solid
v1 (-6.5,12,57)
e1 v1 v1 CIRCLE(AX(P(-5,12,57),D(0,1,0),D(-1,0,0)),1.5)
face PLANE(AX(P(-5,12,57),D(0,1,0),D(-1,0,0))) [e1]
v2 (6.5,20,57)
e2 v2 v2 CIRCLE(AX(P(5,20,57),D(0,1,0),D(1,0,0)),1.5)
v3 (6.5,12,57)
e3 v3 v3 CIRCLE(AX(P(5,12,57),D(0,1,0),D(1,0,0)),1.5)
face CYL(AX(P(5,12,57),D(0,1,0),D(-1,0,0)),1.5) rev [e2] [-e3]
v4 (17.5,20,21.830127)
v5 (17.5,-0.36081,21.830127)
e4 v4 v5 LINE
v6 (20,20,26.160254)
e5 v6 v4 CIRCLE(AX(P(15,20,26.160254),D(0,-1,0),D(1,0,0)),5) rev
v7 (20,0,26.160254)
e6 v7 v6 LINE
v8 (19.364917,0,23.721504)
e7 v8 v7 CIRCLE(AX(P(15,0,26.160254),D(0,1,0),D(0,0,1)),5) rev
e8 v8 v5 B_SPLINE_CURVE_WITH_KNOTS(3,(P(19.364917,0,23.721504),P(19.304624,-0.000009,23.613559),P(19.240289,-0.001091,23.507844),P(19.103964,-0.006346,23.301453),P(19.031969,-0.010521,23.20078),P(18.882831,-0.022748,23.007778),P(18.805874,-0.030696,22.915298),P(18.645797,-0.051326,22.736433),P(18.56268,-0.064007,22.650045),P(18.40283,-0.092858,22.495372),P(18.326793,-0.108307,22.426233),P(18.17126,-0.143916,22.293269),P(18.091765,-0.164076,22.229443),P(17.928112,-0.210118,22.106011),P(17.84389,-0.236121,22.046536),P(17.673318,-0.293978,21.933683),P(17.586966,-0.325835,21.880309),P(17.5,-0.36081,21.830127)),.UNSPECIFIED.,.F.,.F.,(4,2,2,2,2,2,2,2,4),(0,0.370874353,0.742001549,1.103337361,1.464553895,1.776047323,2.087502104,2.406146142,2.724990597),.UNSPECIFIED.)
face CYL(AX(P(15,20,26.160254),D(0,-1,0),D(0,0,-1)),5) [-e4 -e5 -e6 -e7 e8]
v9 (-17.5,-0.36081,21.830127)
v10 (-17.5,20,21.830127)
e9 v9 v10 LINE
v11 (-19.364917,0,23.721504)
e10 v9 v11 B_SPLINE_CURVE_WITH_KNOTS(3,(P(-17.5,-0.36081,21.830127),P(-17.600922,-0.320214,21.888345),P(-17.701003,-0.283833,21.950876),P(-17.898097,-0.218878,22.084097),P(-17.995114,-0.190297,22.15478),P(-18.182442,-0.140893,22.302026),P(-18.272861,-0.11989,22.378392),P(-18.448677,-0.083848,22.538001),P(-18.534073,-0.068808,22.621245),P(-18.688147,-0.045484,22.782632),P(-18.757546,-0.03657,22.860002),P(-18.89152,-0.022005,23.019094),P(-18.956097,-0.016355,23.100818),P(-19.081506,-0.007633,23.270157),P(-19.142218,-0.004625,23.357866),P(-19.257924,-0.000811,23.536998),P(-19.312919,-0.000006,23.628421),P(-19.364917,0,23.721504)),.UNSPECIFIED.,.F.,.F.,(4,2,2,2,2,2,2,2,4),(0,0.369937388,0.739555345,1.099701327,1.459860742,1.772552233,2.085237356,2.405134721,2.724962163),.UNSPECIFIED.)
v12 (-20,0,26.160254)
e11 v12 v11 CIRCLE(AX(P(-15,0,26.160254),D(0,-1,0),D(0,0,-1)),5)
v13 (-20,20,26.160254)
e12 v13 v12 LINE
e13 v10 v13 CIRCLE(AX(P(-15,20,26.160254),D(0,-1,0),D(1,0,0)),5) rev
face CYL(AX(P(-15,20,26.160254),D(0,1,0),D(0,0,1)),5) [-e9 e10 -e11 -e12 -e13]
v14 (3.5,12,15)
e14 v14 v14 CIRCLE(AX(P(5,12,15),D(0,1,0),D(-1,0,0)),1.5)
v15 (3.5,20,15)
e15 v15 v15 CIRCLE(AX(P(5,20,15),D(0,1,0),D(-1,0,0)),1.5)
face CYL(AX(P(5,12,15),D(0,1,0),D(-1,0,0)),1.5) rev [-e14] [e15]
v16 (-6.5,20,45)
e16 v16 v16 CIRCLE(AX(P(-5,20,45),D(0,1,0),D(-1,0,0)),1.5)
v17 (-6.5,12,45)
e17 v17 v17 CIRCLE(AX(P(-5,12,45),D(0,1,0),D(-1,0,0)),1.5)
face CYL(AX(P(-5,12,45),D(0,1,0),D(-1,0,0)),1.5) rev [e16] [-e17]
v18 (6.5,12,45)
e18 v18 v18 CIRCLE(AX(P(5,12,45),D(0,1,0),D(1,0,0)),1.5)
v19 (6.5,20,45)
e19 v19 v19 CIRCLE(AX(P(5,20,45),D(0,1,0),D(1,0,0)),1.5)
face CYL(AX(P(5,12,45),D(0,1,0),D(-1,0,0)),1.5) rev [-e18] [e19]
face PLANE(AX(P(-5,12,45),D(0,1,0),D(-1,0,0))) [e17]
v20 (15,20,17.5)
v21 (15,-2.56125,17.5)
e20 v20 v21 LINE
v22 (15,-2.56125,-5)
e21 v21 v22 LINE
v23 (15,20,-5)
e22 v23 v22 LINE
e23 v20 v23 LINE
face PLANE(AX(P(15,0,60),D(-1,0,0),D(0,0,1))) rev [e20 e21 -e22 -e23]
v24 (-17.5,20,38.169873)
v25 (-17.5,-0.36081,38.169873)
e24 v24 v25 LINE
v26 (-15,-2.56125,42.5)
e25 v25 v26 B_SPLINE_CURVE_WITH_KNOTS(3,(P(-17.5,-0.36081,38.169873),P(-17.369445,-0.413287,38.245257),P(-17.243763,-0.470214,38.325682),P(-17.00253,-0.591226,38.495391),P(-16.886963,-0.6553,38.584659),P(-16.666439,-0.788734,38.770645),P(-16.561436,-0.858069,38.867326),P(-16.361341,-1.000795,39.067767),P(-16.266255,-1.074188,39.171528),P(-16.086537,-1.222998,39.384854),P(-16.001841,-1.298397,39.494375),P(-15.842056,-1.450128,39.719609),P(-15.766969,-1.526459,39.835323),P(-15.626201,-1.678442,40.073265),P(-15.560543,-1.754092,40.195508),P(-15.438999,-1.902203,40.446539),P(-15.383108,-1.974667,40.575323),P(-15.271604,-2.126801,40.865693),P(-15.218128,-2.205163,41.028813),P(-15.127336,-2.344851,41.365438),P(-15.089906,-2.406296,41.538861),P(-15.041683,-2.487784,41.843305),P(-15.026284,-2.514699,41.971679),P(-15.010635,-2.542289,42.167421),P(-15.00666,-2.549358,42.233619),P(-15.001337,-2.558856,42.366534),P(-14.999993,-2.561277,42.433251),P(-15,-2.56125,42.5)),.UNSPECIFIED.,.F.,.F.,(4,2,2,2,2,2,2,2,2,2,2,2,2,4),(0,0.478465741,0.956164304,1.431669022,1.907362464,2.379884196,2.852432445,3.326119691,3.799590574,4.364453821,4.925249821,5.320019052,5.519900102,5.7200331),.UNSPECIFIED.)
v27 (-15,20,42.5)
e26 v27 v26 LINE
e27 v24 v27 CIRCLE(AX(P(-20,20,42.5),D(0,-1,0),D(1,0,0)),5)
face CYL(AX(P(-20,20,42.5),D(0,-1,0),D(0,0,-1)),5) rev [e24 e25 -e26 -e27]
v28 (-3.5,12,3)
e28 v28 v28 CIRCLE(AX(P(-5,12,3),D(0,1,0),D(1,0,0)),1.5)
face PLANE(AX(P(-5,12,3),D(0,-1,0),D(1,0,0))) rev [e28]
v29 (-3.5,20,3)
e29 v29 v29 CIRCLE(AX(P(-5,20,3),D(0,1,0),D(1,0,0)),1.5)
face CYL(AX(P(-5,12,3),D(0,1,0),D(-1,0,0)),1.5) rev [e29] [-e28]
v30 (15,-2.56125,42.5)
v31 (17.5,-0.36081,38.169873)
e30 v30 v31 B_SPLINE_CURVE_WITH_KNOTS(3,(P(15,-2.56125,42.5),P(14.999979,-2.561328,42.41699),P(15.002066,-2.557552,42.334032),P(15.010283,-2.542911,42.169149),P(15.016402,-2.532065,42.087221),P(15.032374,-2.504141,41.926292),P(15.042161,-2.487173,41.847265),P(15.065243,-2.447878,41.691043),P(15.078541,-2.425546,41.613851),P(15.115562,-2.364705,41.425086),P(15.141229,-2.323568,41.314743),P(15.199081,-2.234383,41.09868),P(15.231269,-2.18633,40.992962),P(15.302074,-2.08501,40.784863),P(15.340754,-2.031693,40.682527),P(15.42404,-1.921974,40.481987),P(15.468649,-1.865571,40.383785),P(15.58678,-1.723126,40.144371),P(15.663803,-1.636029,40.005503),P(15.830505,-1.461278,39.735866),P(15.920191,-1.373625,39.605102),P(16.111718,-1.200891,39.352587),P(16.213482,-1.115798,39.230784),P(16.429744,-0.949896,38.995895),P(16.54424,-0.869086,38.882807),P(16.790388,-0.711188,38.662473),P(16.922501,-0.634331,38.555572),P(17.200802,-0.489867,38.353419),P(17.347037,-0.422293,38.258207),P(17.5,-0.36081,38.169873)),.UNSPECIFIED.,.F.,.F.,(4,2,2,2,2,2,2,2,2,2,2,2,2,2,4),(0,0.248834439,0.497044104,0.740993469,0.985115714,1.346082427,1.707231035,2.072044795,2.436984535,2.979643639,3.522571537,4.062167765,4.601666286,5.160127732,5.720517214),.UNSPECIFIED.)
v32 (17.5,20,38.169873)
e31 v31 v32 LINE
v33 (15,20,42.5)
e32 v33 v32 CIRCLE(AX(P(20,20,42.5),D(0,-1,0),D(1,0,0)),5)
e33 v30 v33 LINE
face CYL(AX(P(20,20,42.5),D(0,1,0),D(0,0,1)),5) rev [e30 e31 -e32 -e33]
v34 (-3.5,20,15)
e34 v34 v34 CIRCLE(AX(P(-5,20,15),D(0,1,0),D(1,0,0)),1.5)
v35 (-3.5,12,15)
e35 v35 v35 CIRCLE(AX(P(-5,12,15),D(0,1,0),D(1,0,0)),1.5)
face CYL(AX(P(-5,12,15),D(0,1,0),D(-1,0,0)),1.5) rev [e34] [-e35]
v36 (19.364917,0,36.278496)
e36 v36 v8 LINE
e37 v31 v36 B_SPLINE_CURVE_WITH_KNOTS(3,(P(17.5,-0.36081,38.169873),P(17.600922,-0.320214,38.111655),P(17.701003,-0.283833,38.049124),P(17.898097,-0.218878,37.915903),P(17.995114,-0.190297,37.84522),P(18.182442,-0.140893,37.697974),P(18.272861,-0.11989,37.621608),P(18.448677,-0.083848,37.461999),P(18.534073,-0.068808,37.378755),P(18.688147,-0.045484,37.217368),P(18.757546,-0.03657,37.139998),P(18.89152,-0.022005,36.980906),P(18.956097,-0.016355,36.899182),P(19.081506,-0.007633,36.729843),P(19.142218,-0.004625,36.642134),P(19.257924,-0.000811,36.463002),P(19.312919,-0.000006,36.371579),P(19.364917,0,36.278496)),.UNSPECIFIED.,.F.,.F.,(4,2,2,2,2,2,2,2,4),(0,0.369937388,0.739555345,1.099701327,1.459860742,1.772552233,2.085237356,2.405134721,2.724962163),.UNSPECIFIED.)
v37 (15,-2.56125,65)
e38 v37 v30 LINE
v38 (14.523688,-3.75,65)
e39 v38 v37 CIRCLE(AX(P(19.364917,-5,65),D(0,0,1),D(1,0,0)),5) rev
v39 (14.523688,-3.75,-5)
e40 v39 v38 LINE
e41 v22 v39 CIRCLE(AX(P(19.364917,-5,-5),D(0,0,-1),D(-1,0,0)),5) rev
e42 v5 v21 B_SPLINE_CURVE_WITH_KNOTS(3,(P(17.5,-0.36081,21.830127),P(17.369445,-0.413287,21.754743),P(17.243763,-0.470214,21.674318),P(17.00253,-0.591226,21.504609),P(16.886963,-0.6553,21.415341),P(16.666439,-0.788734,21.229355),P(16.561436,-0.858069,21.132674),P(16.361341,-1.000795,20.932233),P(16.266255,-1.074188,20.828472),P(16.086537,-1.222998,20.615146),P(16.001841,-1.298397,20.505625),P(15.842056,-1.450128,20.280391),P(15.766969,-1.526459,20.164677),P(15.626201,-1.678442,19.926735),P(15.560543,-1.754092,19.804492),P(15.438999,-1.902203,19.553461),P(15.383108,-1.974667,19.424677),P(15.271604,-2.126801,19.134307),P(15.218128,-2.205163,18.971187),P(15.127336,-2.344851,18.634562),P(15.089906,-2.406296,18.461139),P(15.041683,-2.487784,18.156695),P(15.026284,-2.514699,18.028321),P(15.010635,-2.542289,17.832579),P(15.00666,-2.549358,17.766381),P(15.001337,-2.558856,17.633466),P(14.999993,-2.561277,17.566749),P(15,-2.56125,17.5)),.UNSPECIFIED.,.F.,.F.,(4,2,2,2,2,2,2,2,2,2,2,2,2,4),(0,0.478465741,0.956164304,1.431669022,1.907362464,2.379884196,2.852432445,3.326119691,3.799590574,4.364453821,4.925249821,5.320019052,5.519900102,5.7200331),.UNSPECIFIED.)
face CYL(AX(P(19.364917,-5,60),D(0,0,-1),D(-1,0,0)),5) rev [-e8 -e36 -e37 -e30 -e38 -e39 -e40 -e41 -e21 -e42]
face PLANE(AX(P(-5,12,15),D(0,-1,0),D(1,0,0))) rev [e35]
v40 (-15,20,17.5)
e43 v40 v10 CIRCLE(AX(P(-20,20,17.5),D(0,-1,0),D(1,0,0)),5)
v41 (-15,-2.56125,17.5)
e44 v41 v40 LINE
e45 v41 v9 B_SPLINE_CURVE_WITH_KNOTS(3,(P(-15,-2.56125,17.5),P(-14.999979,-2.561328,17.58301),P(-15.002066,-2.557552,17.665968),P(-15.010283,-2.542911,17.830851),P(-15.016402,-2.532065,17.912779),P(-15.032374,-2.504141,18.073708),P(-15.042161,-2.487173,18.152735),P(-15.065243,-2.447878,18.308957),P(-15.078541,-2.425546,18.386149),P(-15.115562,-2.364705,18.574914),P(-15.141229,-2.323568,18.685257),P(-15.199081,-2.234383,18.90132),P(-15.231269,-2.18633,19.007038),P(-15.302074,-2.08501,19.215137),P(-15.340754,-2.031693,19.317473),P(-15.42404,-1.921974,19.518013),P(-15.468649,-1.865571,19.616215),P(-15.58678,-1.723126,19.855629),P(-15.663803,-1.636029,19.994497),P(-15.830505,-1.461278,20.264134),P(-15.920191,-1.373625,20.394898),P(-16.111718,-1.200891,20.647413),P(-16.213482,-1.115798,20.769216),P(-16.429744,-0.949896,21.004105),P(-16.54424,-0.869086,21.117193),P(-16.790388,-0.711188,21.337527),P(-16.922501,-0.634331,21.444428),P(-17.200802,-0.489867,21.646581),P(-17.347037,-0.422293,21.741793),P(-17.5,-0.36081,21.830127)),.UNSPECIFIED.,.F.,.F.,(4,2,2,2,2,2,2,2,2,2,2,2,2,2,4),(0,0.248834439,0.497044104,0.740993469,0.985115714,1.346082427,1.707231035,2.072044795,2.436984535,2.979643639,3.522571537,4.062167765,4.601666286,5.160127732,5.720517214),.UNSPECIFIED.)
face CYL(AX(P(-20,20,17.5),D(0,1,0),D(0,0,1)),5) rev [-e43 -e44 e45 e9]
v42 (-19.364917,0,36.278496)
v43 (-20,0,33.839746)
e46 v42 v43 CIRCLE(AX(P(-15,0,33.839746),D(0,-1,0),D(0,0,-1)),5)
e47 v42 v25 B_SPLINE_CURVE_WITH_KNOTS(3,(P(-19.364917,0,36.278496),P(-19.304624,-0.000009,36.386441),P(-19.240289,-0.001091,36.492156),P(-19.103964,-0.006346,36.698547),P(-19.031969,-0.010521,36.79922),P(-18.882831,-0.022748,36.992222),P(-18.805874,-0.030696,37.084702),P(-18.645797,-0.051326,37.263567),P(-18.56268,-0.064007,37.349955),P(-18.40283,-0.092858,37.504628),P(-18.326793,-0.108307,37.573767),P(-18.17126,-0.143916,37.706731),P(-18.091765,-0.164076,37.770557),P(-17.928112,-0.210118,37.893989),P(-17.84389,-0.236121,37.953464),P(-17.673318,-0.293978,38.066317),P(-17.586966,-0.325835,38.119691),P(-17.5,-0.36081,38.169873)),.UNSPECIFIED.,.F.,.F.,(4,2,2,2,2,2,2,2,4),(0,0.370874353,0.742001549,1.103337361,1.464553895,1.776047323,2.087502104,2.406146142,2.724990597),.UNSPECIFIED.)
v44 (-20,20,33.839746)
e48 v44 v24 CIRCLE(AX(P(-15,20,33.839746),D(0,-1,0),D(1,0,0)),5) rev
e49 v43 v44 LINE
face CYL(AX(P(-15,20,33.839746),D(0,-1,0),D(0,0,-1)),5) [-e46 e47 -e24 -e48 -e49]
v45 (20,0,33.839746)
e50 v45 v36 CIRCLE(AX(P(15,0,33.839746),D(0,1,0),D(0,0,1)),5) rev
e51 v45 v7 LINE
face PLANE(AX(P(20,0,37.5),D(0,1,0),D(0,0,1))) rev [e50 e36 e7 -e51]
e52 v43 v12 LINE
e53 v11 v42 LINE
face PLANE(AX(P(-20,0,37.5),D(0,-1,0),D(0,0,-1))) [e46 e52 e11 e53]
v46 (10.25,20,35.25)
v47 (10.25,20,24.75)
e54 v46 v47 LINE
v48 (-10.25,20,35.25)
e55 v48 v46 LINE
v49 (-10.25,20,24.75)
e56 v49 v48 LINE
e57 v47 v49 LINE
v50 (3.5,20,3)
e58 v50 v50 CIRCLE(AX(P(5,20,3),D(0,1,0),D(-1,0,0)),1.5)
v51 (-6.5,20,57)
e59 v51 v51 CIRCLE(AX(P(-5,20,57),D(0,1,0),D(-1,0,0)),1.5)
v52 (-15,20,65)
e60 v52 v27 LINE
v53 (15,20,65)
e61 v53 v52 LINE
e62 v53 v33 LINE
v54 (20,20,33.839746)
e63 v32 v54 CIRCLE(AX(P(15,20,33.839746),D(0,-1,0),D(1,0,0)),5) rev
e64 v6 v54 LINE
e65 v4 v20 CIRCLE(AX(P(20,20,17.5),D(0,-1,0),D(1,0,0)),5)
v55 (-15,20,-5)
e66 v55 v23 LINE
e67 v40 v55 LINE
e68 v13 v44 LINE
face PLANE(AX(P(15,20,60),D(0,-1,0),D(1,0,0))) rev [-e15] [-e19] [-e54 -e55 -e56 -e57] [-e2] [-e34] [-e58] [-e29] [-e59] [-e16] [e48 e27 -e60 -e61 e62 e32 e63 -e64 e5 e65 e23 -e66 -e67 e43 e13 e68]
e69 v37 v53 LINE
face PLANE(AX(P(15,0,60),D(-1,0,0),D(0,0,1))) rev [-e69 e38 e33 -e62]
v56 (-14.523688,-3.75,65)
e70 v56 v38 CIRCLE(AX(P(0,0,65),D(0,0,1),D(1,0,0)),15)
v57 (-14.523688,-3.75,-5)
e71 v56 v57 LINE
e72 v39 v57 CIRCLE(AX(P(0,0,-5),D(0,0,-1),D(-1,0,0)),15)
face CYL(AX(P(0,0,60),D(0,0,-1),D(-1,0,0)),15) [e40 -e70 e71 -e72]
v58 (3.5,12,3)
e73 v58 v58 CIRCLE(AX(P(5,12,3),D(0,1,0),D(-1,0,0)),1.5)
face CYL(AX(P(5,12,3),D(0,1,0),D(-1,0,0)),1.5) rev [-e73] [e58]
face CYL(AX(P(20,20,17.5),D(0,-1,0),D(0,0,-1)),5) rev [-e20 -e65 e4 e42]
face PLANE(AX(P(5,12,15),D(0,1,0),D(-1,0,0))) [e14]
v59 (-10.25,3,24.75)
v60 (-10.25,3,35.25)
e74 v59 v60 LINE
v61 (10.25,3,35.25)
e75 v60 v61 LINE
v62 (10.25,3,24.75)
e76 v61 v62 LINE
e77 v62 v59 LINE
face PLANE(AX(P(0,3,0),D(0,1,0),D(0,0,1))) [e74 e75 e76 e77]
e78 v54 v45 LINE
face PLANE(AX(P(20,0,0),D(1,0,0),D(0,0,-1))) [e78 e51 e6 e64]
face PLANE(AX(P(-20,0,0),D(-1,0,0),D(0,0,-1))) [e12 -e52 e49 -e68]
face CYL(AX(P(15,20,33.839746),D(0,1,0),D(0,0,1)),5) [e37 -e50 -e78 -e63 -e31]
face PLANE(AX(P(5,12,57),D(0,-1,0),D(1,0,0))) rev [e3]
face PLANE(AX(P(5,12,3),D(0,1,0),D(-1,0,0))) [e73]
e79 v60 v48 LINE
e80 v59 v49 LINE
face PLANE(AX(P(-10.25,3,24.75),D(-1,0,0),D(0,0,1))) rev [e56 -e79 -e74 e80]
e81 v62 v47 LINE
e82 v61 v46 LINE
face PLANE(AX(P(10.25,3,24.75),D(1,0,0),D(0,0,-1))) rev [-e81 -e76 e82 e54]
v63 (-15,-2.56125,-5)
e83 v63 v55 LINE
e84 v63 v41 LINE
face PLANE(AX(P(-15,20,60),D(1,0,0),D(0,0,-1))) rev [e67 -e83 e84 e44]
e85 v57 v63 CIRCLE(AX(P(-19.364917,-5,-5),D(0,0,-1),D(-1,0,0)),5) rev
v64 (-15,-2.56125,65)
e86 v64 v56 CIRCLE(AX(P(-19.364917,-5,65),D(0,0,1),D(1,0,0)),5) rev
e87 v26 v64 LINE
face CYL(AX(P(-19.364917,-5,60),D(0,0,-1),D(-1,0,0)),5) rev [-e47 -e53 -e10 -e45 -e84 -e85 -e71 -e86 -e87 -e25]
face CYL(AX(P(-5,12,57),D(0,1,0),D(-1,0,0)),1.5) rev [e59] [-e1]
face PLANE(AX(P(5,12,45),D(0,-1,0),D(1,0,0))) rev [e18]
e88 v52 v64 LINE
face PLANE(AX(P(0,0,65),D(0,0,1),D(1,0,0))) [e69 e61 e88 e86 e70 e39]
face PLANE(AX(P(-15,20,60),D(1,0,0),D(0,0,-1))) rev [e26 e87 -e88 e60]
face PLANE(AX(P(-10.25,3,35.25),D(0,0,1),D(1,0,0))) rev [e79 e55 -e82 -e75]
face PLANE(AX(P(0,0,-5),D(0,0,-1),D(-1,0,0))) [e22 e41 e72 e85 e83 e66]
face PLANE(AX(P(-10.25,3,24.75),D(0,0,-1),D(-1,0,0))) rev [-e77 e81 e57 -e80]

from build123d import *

# Parameters (mm, degrees)
EXTRUDE_1_DEPTH     = 60
SKETCH_2_W          = 20.5
SKETCH_2_H          = 10.5
CUT_EXTRUDE_1_DEPTH = 17
SKETCH_3_W          = 15
SKETCH_3_H          = 20
EXTRUDE_2_DEPTH     = 5
FILLET_1_R          = 5
FILLET_2_R          = 5
SKETCH_4_R          = 1.5
CUT_EXTRUDE_2_DEPTH = 8
EXTRUDE_START       = 5
EXTRUDE_3_DEPTH     = 5
EXTRUDE_4_DEPTH     = 5
FILLET_START        = 17.4999999
FILLET_3_DEPTH      = 25.0000001
FILLET_START_2      = -5
FILLET_3_2_DEPTH    = 70
FILLET_START_3      = -4
FILLET_3_3_DEPTH    = 4


with BuildPart() as part:
    # 草图1 → 凸台-拉伸1 (new body)
    with BuildSketch(Plane.XY):
        with BuildLine():
            Line((15, 0), (15, 20))
            Line((15, 20), (-15, 20))
            Line((-15, 20), (-15, 0))
            ThreePointArc((-15, 0), (0, -15), (15, 0))
        make_face()
    extrude(amount=EXTRUDE_1_DEPTH)

    # 草图2 → 切除-拉伸1 (cut)
    with BuildSketch(Plane(origin=(0, 20, 0), x_dir=(1, 0, 0), z_dir=(0, 1, 0))):
        with Locations((0, -30)):
            Rectangle(SKETCH_2_W, SKETCH_2_H)
    extrude(amount=-CUT_EXTRUDE_1_DEPTH, mode=Mode.SUBTRACT)

    # 草图3 → 凸台-拉伸2 (add)
    with BuildSketch(Plane(origin=(15, 0, 0), x_dir=(0, 0, -1), z_dir=(1, 0, 0))):
        with Locations((-30, 10)):
            Rectangle(SKETCH_3_W, SKETCH_3_H)
    extrude_2 = extrude(amount=EXTRUDE_2_DEPTH)

    # 镜向1: 凸台-拉伸2 across plane
    add(extrude_2.mirror(Plane(origin=(0, 0, 0), x_dir=(0, 0, 1), z_dir=(1, 0, 0))))

    # 圆角1
    fillet_1_edges = [part.edges().sort_by_distance(p)[0] for p in [
        (-15, 10, 37.5),
        (-15, 10, 22.5),
        (15, 10, 37.5),
        (15, 10, 22.5),
    ]]
    fillet(fillet_1_edges, radius=FILLET_1_R - 0.0001)  # a hair under: the kernel refuses the full size

    # 圆角2
    fillet_2_edges = [part.edges().sort_by_distance(p)[0] for p in [
        (20, 10, 37.5),
        (20, 10, 22.5),
        (-20, 10, 37.5),
        (-20, 10, 22.5),
    ]]
    fillet(fillet_2_edges, radius=FILLET_2_R)

    # 草图4 → 切除-拉伸2 (cut)
    with BuildSketch(Plane(origin=(0, 20, 0), x_dir=(1, 0, 0), z_dir=(0, 1, 0))):
        with Locations(Location((5, -3, 0), (0, 0, 180))):
            Circle(SKETCH_4_R)
        with Locations(Location((5, -15, 0), (0, 0, 180))):
            Circle(SKETCH_4_R)
        with Locations((-5, -15)):
            Circle(SKETCH_4_R)
        with Locations((-5, -3)):
            Circle(SKETCH_4_R)
        with Locations((5, -45)):
            Circle(SKETCH_4_R)
        with Locations(Location((-5, -45, 0), (0, 0, 180))):
            Circle(SKETCH_4_R)
        with Locations((5, -57)):
            Circle(SKETCH_4_R)
        with Locations(Location((-5, -57, 0), (0, 0, 180))):
            Circle(SKETCH_4_R)
    extrude(amount=-CUT_EXTRUDE_2_DEPTH, mode=Mode.SUBTRACT)

    # 草图5 → 凸台-拉伸3 (add)
    with BuildSketch(Plane(origin=(0, 0, 0), x_dir=(-1, 0, 0), z_dir=(0, 0, -1)).offset(EXTRUDE_START)):
        with BuildLine():
            Line((-15, 20), (15, 20))
            Line((15, 20), (15, 0))
            ThreePointArc((15, 0), (0, -15), (-15, 0))
            Line((-15, 0), (-15, 20))
        make_face()
    extrude(amount=-EXTRUDE_3_DEPTH)

    # 草图6 → 凸台-拉伸4 (add)
    with BuildSketch(Plane.XY.offset(60)):
        with BuildLine():
            Line((-15, 0), (-15, 20))
            Line((-15, 20), (15, 20))
            Line((15, 20), (15, 0))
            ThreePointArc((15, 0), (0, -15), (-15, 0))
        make_face()
    extrude(amount=EXTRUDE_4_DEPTH)

    # 圆角3: read off the stored shape, not the designer's step
    # 圆角3 outline → 圆角3 (add)
    with BuildSketch(Plane.XY.offset(FILLET_START)):
        with BuildLine():
            ThreePointArc((-19.364916731, 0), (-16.834477084, -0.687590559), (-15, -2.561249924))
            Line((-15, -2.561249924), (-15, 0))
            Line((-15, 0), (-19.364916731, 0))
        make_face()
        with BuildLine():
            Line((19.364916731, 0), (15, 0))
            Line((15, 0), (15, -2.561249924))
            ThreePointArc((15, -2.561249924), (16.834477084, -0.687590559), (19.364916731, 0))
        make_face()
    extrude(amount=FILLET_3_DEPTH)

    # Fillet 3 2 outline → Fillet 3 2 (add)
    with BuildSketch(Plane.XY.offset(FILLET_START_2)):
        with BuildLine():
            ThreePointArc((15, 0), (14.880445444, -1.890064387), (14.523687548, -3.75))
            ThreePointArc((14.523687548, -3.75), (14.723627866, -3.140312481), (15, -2.561249924))
            Line((15, -2.561249924), (15, 0))
        make_face()
        with BuildLine():
            Line((-15, 0), (-15, -2.561249924))
            ThreePointArc((-15, -2.561249924), (-14.723627866, -3.140312481), (-14.523687548, -3.75))
            ThreePointArc((-14.523687548, -3.75), (-14.880445444, -1.890064387), (-15, 0))
        make_face()
    extrude(amount=FILLET_3_2_DEPTH)

    # Fillet 3 3 outline → Fillet 3 3 (cut)
    with BuildSketch(Plane(origin=(0, 0, 0), x_dir=(1, 0, 0), z_dir=(0, 1, 0)).offset(FILLET_START_3)):
        with BuildLine():
            Line((19.364916731, -42.5), (19.364916731, -36.278496038))
            ThreePointArc((19.364916731, -36.278496038), (18.560350701, -37.350287642), (17.5, -38.169872981))
            ThreePointArc((17.5, -38.169872981), (15.669872981, -40), (15, -42.5))
            Line((15, -42.5), (19.364916731, -42.5))
        make_face()
        with BuildLine():
            Line((19.364916731, -23.721503962), (19.364916731, -17.4999999))
            Line((19.364916731, -17.4999999), (15, -17.5))
            ThreePointArc((15, -17.5), (15.669872981, -20), (17.5, -21.830127019))
            ThreePointArc((17.5, -21.830127019), (18.560350701, -22.649712358), (19.364916731, -23.721503962))
        make_face()
        with BuildLine():
            ThreePointArc((-17.5, -21.830127019), (-15.669872981, -20), (-15, -17.5))
            Line((-15, -17.5), (-19.364916731, -17.4999999))
            Line((-19.364916731, -17.4999999), (-19.364916731, -23.721503962))
            ThreePointArc((-19.364916731, -23.721503962), (-18.560350701, -22.649712358), (-17.5, -21.830127019))
        make_face()
        with BuildLine():
            Line((-19.364916731, -42.5), (-15, -42.5))
            ThreePointArc((-15, -42.5), (-15.669872981, -40), (-17.5, -38.169872981))
            ThreePointArc((-17.5, -38.169872981), (-18.560350701, -37.350287642), (-19.364916731, -36.278496038))
            Line((-19.364916731, -36.278496038), (-19.364916731, -42.5))
        make_face()
    extrude(amount=FILLET_3_3_DEPTH, mode=Mode.SUBTRACT)


solid = part.part
